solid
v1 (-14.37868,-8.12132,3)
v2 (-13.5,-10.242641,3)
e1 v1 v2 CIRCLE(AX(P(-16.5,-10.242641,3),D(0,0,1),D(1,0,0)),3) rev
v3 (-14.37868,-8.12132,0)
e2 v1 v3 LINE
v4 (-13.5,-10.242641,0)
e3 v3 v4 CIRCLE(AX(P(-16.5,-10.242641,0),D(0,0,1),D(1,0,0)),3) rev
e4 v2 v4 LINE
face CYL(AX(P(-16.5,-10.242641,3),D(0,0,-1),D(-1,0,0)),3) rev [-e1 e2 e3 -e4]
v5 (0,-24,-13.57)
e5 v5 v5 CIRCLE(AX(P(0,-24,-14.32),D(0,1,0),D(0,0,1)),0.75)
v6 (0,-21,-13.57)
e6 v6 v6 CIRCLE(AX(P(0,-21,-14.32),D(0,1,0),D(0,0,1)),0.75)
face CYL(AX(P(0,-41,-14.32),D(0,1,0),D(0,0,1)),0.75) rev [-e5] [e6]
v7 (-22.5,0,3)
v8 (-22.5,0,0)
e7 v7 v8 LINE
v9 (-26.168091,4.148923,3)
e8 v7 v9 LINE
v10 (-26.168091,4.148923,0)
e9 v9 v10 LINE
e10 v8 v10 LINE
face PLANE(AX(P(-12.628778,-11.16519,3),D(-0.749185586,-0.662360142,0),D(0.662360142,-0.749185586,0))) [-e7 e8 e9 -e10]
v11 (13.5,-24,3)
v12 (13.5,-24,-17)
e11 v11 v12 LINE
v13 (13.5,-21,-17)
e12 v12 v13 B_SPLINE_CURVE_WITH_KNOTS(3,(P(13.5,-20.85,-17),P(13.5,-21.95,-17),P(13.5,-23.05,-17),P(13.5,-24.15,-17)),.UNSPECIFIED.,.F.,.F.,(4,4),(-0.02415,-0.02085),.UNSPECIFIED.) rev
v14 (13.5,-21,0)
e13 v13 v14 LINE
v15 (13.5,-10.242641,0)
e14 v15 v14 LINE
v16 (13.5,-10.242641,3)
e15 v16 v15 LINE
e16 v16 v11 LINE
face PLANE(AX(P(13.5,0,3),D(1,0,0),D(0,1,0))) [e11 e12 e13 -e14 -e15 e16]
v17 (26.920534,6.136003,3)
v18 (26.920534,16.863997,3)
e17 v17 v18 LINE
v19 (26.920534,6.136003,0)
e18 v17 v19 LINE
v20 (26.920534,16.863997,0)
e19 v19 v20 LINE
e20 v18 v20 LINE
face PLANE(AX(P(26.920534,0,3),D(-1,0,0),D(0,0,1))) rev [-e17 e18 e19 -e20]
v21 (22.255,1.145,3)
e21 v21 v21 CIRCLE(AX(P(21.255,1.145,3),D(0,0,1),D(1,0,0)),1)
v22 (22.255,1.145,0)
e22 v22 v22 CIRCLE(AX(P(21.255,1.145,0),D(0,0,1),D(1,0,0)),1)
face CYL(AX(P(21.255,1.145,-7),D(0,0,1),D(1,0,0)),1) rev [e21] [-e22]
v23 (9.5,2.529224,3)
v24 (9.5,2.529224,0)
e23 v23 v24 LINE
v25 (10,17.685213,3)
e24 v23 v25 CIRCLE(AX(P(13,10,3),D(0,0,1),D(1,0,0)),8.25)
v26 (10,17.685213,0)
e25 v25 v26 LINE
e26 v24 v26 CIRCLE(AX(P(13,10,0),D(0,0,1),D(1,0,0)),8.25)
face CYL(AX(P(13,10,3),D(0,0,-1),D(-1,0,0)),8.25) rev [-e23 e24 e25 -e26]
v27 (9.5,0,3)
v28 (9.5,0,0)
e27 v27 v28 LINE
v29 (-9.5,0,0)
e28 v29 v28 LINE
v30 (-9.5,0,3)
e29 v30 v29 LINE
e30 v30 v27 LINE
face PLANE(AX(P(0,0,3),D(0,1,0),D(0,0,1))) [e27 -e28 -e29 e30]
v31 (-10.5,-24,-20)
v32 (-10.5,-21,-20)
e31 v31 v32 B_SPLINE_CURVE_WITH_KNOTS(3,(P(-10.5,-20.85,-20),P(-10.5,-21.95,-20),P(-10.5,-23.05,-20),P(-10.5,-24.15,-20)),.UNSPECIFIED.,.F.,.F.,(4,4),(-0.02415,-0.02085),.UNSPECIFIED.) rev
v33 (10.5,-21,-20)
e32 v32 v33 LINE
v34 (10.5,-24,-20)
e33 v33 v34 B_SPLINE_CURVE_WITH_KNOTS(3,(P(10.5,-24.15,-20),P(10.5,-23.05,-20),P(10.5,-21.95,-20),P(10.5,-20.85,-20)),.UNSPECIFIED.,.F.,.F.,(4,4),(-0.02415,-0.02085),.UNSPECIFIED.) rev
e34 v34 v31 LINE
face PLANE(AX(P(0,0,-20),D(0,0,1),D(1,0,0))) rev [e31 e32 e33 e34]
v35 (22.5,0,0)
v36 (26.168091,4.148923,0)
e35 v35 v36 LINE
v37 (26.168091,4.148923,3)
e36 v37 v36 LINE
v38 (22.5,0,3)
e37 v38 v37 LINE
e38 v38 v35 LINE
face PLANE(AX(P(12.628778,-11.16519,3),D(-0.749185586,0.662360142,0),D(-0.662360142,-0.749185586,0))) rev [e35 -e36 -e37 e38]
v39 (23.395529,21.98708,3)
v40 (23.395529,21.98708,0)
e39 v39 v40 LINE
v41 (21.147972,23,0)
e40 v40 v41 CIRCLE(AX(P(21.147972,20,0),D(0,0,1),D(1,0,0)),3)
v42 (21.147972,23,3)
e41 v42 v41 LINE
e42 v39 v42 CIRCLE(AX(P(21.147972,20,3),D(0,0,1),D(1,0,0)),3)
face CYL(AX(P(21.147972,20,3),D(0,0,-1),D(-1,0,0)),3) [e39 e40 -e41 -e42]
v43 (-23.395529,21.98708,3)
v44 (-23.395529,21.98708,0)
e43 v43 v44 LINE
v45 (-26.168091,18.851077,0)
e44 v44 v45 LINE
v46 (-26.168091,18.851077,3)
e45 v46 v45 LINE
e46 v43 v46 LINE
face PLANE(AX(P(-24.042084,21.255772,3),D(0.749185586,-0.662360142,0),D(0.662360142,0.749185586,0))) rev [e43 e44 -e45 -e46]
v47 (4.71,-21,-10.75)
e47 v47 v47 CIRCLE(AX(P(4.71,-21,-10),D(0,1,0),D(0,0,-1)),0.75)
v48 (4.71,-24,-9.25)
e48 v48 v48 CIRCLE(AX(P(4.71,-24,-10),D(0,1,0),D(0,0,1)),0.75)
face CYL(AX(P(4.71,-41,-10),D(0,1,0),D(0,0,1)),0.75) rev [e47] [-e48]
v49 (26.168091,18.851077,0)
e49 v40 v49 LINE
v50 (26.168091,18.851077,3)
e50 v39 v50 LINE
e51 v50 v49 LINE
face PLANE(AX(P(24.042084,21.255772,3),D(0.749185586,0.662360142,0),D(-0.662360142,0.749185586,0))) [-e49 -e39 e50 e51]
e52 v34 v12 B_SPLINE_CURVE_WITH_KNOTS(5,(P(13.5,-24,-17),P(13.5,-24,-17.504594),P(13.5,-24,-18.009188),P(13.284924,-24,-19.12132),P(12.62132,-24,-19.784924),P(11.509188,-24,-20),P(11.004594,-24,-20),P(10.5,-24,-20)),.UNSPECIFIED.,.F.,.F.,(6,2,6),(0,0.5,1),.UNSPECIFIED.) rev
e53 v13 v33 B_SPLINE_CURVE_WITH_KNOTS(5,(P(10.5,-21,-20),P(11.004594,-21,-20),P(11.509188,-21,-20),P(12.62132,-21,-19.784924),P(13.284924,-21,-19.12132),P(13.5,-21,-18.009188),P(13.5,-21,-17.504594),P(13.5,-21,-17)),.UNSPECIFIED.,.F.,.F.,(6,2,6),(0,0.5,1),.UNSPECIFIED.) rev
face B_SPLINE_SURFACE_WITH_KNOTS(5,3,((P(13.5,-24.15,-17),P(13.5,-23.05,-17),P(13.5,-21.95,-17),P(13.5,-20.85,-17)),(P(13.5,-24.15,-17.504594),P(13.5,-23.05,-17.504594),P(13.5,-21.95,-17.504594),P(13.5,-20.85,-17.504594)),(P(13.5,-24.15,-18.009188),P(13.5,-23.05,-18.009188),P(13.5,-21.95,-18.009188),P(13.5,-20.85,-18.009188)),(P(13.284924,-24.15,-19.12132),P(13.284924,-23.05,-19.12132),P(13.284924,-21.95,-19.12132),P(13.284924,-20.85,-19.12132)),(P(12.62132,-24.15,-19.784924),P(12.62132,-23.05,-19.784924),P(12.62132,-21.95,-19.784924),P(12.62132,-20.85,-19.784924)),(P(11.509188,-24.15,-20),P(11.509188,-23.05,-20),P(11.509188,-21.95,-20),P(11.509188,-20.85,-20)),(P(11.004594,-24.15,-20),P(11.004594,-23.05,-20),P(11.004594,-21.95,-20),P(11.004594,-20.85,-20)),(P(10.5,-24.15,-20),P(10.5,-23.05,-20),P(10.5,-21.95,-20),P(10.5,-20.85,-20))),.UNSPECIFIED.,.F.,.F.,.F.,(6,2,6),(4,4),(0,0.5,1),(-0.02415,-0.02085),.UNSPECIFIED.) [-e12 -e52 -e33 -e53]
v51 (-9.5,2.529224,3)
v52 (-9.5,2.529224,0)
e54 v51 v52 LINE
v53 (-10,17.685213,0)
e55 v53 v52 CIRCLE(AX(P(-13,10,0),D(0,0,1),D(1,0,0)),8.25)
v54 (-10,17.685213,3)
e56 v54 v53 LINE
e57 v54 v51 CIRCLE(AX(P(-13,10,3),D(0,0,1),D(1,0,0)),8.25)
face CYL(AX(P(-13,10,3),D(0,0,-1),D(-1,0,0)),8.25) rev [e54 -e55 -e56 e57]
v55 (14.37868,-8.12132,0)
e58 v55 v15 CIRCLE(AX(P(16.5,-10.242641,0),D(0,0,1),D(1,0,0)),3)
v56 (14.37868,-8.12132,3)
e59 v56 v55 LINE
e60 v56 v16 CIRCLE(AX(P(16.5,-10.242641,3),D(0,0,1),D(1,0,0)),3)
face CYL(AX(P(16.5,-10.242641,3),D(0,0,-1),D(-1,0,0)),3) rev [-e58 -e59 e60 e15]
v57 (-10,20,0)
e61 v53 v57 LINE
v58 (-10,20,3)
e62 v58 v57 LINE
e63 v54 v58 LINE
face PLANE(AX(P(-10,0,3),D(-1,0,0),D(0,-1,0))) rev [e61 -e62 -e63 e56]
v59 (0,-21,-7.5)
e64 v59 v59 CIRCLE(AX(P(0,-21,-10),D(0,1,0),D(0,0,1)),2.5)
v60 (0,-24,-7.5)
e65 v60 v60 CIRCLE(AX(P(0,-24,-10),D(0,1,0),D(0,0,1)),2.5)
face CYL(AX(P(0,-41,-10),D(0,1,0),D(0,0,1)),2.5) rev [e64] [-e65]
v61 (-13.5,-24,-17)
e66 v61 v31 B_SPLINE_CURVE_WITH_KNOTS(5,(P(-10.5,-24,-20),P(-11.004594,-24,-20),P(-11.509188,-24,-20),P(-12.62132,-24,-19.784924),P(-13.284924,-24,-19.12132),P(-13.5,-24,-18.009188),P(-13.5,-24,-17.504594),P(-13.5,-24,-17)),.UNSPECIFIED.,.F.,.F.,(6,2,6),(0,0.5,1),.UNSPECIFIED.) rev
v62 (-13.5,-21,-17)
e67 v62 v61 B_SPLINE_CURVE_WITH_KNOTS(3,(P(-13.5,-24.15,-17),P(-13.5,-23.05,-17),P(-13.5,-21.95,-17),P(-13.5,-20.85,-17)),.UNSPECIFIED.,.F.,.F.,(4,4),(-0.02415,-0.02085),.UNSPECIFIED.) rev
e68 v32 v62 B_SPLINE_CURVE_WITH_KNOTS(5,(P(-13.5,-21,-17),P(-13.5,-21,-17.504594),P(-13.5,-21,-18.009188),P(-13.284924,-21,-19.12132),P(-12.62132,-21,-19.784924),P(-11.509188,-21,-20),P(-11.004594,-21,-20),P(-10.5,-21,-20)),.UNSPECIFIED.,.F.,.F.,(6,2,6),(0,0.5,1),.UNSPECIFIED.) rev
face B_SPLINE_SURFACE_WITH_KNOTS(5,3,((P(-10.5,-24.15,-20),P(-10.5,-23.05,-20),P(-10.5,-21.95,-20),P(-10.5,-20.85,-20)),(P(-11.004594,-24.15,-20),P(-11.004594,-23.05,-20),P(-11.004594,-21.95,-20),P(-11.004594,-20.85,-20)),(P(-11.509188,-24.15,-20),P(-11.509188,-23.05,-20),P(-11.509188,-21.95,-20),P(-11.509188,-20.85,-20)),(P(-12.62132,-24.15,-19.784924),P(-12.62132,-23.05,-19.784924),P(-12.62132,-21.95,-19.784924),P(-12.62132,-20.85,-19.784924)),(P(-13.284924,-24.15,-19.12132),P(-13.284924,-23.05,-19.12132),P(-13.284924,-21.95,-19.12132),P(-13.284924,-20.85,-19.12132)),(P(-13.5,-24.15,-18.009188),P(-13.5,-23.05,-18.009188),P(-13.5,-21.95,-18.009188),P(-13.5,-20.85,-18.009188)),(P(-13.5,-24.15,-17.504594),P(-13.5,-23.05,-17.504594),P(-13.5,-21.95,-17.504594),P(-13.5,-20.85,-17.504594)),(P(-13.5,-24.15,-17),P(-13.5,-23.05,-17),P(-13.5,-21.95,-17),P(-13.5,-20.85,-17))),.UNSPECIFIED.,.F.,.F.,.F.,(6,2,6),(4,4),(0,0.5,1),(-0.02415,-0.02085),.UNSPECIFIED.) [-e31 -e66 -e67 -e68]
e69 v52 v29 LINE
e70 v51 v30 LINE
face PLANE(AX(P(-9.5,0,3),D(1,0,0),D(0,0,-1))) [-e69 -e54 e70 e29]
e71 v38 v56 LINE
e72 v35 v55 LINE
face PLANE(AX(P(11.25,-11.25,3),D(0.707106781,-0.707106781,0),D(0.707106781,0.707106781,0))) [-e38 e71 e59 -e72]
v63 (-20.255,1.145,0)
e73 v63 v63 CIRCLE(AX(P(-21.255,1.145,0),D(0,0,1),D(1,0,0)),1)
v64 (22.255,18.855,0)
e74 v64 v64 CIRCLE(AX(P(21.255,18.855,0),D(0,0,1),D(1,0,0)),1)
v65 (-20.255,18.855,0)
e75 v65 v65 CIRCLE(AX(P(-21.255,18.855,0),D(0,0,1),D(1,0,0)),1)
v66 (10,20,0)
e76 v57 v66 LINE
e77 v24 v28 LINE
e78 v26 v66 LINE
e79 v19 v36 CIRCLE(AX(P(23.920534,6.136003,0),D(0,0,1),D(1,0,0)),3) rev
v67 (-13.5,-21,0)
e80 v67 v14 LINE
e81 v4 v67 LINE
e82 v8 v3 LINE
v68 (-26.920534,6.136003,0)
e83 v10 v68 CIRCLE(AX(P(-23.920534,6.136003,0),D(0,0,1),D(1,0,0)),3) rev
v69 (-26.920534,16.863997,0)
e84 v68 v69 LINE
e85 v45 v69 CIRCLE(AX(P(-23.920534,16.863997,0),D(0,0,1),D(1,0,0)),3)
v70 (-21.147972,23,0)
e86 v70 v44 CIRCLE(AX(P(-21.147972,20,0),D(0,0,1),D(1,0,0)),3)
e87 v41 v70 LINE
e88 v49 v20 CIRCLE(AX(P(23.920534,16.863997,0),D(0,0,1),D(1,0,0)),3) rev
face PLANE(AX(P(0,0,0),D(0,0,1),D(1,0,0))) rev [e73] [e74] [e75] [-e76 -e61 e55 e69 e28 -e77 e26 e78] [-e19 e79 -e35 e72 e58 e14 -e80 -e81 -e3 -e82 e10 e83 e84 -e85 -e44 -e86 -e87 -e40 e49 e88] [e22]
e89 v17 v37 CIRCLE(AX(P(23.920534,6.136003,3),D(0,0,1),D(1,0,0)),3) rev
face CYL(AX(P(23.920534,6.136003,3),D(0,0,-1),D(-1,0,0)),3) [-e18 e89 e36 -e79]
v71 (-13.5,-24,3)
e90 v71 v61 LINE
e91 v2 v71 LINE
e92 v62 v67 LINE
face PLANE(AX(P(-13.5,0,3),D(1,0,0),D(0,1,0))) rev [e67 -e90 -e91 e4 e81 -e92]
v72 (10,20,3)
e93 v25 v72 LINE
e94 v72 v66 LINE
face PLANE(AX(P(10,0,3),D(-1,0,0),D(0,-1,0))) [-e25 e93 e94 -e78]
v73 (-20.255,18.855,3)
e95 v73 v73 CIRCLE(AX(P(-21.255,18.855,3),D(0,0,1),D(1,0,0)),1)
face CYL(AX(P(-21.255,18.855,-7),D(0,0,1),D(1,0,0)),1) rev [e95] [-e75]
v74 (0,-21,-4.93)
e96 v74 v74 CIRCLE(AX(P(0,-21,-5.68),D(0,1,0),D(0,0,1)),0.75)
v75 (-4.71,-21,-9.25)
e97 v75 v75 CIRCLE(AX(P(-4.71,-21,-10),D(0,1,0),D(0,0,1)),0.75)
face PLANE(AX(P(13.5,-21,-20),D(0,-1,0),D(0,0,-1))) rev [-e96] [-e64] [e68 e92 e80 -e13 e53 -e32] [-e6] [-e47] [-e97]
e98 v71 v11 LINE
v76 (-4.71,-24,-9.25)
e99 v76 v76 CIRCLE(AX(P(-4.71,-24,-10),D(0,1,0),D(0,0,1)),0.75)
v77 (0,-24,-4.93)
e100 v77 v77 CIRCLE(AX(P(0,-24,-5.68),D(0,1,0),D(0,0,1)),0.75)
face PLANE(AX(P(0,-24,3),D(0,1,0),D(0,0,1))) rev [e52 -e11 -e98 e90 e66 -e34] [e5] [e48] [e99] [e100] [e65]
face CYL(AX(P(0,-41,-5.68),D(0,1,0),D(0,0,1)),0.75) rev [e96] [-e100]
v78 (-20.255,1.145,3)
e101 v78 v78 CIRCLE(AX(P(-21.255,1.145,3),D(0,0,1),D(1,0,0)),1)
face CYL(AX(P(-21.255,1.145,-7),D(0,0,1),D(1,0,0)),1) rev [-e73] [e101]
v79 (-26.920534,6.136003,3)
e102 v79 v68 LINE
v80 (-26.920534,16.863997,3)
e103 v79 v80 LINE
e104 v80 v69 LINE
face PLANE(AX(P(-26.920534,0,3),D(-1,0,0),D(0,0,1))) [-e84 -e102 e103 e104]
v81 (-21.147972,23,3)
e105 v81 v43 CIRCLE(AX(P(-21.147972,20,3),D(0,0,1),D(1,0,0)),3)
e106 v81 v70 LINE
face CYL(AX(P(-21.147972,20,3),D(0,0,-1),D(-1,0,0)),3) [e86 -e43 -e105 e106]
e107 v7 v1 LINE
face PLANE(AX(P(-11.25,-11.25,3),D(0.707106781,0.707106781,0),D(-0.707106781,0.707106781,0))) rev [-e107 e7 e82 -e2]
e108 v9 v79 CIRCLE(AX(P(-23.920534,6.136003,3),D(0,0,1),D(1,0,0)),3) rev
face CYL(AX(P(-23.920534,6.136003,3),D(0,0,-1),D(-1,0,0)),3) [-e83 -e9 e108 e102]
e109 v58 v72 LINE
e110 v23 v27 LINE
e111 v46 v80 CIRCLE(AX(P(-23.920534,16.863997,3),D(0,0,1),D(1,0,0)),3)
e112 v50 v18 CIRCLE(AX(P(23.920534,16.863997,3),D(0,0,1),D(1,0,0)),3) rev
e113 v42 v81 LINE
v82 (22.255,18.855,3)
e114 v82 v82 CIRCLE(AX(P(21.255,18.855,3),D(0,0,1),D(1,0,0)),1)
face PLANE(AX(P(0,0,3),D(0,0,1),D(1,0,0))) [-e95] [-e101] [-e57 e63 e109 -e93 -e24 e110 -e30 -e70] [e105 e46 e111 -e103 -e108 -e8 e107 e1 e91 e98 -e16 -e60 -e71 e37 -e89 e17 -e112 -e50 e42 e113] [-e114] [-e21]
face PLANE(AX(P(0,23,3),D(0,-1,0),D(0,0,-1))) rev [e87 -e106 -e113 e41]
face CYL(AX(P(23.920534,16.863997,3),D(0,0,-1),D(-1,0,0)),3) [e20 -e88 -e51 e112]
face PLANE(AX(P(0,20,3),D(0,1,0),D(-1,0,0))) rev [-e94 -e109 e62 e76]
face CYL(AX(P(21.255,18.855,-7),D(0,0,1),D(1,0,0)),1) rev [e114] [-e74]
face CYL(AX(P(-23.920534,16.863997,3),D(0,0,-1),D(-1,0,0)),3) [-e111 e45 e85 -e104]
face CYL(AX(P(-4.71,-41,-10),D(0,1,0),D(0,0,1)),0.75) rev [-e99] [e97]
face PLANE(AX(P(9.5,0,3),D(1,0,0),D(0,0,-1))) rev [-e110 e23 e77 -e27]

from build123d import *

# Parameters (mm, degrees)
EXTRUDE_1_DEPTH     = 3
SKETCH_2_W          = 27
SKETCH_2_H          = 3
EXTRUDE_2_DEPTH     = 20
FILLET_1_SIZE       = 3
FILLET_2_SIZE       = 3
SKETCH_3_R          = 2.5
SKETCH_3_R_2        = 0.75
CUT_EXTRUDE_1_DEPTH = 20
SKETCH_4_R          = 1
CUT_EXTRUDE_2_DEPTH = 10


with BuildPart() as part:
    # 草图1 → 凸台-拉伸1 (new body)
    with BuildSketch(Plane.XY):
        with BuildLine():
            Line((-10, 23), (-21.14797242, 23))
            ThreePointArc((-21.14797242, 23), (-22.380603493, 22.735072328), (-23.395529179, 21.987080425))
            Line((-23.395529179, 21.987080425), (-26.168091228, 18.851077224))
            ThreePointArc((-26.168091228, 18.851077224), (-26.72612445, 17.926383199), (-26.920534469, 16.863996799))
            Line((-26.920534469, 16.863996799), (-26.920534469, 6.136003201))
            ThreePointArc((-26.920534469, 6.136003201), (-26.72612445, 5.073616801), (-26.168091228, 4.148922776))
            Line((-26.168091228, 4.148922776), (-22.5, 0))
            Line((-22.5, 0), (-14.378679656, -8.121320344))
            ThreePointArc((-14.378679656, -8.121320344), (-13.728361402, -9.09459039), (-13.5, -10.242640687))
            Line((-13.5, -10.242640687), (-13.5, -24))
            Line((-13.5, -24), (13.5, -24))
            Line((13.5, -24), (13.5, -10.242640687))
            ThreePointArc((13.5, -10.242640687), (13.728361402, -9.09459039), (14.378679656, -8.121320344))
            Line((14.378679656, -8.121320344), (22.5, 0))
            Line((22.5, 0), (26.168091228, 4.148922776))
            ThreePointArc((26.168091228, 4.148922776), (26.72612445, 5.073616801), (26.920534469, 6.136003201))
            Line((26.920534469, 6.136003201), (26.920534469, 16.863996799))
            ThreePointArc((26.920534469, 16.863996799), (26.72612445, 17.926383199), (26.168091228, 18.851077224))
            Line((26.168091228, 18.851077224), (23.395529179, 21.987080425))
            ThreePointArc((23.395529179, 21.987080425), (22.380603493, 22.735072328), (21.14797242, 23))
            Line((21.14797242, 23), (10, 23))
            Line((10, 23), (-10, 23))
        make_face()
        with BuildLine():
            Line((-10, 20), (10, 20))
            Line((10, 20), (10, 17.685213074))
            ThreePointArc((10, 17.685213074), (21.245514188, 9.727978361), (9.5, 2.529223601))
            Line((9.5, 2.529223601), (9.5, 0))
            Line((9.5, 0), (-9.5, 0))
            Line((-9.5, 0), (-9.5, 2.529223601))
            ThreePointArc((-9.5, 2.529223601), (-21.245514188, 9.727978361), (-10, 17.685213074))
            Line((-10, 17.685213074), (-10, 20))
        make_face(mode=Mode.SUBTRACT)
    extrude(amount=EXTRUDE_1_DEPTH)

    # 草图2 → 凸台-拉伸2 (add)
    with BuildSketch(Plane(origin=(0, 0, 0), x_dir=(-1, 0, 0), z_dir=(0, 0, -1))):
        with Locations((0, -22.5)):
            Rectangle(SKETCH_2_W, SKETCH_2_H)
    extrude(amount=EXTRUDE_2_DEPTH)

    # 圆角1
    # a fillet whose section is not a circle: 3 mm, written as the material it takes off along each edge
    with BuildSketch(Plane(origin=(13.5, -31.5, -20), x_dir=(-1, 0, 0), z_dir=(0, 1, 0))) as fillet_1_piece_1:
        with BuildLine():
            add(Edge.make_bspline([(FILLET_1_SIZE, 0), (FILLET_1_SIZE * 0.831801948466, 0), (FILLET_1_SIZE * 0.663603896932, 0), (FILLET_1_SIZE * 0.292893218813, FILLET_1_SIZE * 0.0716919198361), (FILLET_1_SIZE * 0.0716919198361, FILLET_1_SIZE * 0.292893218813), (0, FILLET_1_SIZE * 0.663603896932), (0, FILLET_1_SIZE * 0.831801948466), (0, FILLET_1_SIZE)], knots=[0, 0, 0, 0, 0, 0, 0.5, 0.5, 1, 1, 1, 1, 1, 1], degree=5))
            Line((0, FILLET_1_SIZE), (0, 0))
            Line((0, 0), (FILLET_1_SIZE, 0))
        make_face()
    extrude(amount=18, mode=Mode.SUBTRACT)

    # 圆角2
    # a fillet whose section is not a circle: 3 mm, written as the material it takes off along each edge
    with BuildSketch(Plane(origin=(-13.5, -13.5, -20), x_dir=(0, 0, 1), z_dir=(0, -1, 0))) as fillet_2_piece_1:
        with BuildLine():
            add(Edge.make_bspline([(FILLET_2_SIZE, 0), (FILLET_2_SIZE * 0.831801948466, 0), (FILLET_2_SIZE * 0.663603896932, 0), (FILLET_2_SIZE * 0.292893218813, -FILLET_2_SIZE * 0.0716919198361), (FILLET_2_SIZE * 0.0716919198361, -FILLET_2_SIZE * 0.292893218813), (0, -FILLET_2_SIZE * 0.663603896932), (0, -FILLET_2_SIZE * 0.831801948466), (0, -FILLET_2_SIZE)], knots=[0, 0, 0, 0, 0, 0, 0.5, 0.5, 1, 1, 1, 1, 1, 1], degree=5))
            Line((0, -FILLET_2_SIZE), (0, 0))
            Line((0, 0), (FILLET_2_SIZE, 0))
        make_face()
    extrude(amount=18, mode=Mode.SUBTRACT)

    # 草图3 → 切除-拉伸1 (cut)
    with BuildSketch(Plane(origin=(0, -21, 0), x_dir=(1, 0, 0), z_dir=(0, 1, 0))):
        with Locations(Location((0, 10, 0), (0, 0, 270))):
            Circle(SKETCH_3_R)
        with Locations(Location((-4.71, 10, 0), (0, 0, 270))):
            Circle(SKETCH_3_R_2)
        with Locations(Location((0, 14.32, 0), (0, 0, 270))):
            Circle(SKETCH_3_R_2)
        with Locations(Location((0, 5.68, 0), (0, 0, 270))):
            Circle(SKETCH_3_R_2)
        with Locations(Location((4.71, 10, 0), (0, 0, 270))):
            Circle(SKETCH_3_R_2)
    extrude(amount=-CUT_EXTRUDE_1_DEPTH, mode=Mode.SUBTRACT)

    # 草图4 → 切除-拉伸2 (cut)
    with BuildSketch(Plane.XY.offset(3)):
        with Locations((-21.255, 18.855)):
            Circle(SKETCH_4_R)
        with Locations((-21.255, 1.145)):
            Circle(SKETCH_4_R)
        with Locations((21.255, 18.855)):
            Circle(SKETCH_4_R)
        with Locations((21.255, 1.145)):
            Circle(SKETCH_4_R)
    extrude(amount=-CUT_EXTRUDE_2_DEPTH, mode=Mode.SUBTRACT)


solid = part.part
